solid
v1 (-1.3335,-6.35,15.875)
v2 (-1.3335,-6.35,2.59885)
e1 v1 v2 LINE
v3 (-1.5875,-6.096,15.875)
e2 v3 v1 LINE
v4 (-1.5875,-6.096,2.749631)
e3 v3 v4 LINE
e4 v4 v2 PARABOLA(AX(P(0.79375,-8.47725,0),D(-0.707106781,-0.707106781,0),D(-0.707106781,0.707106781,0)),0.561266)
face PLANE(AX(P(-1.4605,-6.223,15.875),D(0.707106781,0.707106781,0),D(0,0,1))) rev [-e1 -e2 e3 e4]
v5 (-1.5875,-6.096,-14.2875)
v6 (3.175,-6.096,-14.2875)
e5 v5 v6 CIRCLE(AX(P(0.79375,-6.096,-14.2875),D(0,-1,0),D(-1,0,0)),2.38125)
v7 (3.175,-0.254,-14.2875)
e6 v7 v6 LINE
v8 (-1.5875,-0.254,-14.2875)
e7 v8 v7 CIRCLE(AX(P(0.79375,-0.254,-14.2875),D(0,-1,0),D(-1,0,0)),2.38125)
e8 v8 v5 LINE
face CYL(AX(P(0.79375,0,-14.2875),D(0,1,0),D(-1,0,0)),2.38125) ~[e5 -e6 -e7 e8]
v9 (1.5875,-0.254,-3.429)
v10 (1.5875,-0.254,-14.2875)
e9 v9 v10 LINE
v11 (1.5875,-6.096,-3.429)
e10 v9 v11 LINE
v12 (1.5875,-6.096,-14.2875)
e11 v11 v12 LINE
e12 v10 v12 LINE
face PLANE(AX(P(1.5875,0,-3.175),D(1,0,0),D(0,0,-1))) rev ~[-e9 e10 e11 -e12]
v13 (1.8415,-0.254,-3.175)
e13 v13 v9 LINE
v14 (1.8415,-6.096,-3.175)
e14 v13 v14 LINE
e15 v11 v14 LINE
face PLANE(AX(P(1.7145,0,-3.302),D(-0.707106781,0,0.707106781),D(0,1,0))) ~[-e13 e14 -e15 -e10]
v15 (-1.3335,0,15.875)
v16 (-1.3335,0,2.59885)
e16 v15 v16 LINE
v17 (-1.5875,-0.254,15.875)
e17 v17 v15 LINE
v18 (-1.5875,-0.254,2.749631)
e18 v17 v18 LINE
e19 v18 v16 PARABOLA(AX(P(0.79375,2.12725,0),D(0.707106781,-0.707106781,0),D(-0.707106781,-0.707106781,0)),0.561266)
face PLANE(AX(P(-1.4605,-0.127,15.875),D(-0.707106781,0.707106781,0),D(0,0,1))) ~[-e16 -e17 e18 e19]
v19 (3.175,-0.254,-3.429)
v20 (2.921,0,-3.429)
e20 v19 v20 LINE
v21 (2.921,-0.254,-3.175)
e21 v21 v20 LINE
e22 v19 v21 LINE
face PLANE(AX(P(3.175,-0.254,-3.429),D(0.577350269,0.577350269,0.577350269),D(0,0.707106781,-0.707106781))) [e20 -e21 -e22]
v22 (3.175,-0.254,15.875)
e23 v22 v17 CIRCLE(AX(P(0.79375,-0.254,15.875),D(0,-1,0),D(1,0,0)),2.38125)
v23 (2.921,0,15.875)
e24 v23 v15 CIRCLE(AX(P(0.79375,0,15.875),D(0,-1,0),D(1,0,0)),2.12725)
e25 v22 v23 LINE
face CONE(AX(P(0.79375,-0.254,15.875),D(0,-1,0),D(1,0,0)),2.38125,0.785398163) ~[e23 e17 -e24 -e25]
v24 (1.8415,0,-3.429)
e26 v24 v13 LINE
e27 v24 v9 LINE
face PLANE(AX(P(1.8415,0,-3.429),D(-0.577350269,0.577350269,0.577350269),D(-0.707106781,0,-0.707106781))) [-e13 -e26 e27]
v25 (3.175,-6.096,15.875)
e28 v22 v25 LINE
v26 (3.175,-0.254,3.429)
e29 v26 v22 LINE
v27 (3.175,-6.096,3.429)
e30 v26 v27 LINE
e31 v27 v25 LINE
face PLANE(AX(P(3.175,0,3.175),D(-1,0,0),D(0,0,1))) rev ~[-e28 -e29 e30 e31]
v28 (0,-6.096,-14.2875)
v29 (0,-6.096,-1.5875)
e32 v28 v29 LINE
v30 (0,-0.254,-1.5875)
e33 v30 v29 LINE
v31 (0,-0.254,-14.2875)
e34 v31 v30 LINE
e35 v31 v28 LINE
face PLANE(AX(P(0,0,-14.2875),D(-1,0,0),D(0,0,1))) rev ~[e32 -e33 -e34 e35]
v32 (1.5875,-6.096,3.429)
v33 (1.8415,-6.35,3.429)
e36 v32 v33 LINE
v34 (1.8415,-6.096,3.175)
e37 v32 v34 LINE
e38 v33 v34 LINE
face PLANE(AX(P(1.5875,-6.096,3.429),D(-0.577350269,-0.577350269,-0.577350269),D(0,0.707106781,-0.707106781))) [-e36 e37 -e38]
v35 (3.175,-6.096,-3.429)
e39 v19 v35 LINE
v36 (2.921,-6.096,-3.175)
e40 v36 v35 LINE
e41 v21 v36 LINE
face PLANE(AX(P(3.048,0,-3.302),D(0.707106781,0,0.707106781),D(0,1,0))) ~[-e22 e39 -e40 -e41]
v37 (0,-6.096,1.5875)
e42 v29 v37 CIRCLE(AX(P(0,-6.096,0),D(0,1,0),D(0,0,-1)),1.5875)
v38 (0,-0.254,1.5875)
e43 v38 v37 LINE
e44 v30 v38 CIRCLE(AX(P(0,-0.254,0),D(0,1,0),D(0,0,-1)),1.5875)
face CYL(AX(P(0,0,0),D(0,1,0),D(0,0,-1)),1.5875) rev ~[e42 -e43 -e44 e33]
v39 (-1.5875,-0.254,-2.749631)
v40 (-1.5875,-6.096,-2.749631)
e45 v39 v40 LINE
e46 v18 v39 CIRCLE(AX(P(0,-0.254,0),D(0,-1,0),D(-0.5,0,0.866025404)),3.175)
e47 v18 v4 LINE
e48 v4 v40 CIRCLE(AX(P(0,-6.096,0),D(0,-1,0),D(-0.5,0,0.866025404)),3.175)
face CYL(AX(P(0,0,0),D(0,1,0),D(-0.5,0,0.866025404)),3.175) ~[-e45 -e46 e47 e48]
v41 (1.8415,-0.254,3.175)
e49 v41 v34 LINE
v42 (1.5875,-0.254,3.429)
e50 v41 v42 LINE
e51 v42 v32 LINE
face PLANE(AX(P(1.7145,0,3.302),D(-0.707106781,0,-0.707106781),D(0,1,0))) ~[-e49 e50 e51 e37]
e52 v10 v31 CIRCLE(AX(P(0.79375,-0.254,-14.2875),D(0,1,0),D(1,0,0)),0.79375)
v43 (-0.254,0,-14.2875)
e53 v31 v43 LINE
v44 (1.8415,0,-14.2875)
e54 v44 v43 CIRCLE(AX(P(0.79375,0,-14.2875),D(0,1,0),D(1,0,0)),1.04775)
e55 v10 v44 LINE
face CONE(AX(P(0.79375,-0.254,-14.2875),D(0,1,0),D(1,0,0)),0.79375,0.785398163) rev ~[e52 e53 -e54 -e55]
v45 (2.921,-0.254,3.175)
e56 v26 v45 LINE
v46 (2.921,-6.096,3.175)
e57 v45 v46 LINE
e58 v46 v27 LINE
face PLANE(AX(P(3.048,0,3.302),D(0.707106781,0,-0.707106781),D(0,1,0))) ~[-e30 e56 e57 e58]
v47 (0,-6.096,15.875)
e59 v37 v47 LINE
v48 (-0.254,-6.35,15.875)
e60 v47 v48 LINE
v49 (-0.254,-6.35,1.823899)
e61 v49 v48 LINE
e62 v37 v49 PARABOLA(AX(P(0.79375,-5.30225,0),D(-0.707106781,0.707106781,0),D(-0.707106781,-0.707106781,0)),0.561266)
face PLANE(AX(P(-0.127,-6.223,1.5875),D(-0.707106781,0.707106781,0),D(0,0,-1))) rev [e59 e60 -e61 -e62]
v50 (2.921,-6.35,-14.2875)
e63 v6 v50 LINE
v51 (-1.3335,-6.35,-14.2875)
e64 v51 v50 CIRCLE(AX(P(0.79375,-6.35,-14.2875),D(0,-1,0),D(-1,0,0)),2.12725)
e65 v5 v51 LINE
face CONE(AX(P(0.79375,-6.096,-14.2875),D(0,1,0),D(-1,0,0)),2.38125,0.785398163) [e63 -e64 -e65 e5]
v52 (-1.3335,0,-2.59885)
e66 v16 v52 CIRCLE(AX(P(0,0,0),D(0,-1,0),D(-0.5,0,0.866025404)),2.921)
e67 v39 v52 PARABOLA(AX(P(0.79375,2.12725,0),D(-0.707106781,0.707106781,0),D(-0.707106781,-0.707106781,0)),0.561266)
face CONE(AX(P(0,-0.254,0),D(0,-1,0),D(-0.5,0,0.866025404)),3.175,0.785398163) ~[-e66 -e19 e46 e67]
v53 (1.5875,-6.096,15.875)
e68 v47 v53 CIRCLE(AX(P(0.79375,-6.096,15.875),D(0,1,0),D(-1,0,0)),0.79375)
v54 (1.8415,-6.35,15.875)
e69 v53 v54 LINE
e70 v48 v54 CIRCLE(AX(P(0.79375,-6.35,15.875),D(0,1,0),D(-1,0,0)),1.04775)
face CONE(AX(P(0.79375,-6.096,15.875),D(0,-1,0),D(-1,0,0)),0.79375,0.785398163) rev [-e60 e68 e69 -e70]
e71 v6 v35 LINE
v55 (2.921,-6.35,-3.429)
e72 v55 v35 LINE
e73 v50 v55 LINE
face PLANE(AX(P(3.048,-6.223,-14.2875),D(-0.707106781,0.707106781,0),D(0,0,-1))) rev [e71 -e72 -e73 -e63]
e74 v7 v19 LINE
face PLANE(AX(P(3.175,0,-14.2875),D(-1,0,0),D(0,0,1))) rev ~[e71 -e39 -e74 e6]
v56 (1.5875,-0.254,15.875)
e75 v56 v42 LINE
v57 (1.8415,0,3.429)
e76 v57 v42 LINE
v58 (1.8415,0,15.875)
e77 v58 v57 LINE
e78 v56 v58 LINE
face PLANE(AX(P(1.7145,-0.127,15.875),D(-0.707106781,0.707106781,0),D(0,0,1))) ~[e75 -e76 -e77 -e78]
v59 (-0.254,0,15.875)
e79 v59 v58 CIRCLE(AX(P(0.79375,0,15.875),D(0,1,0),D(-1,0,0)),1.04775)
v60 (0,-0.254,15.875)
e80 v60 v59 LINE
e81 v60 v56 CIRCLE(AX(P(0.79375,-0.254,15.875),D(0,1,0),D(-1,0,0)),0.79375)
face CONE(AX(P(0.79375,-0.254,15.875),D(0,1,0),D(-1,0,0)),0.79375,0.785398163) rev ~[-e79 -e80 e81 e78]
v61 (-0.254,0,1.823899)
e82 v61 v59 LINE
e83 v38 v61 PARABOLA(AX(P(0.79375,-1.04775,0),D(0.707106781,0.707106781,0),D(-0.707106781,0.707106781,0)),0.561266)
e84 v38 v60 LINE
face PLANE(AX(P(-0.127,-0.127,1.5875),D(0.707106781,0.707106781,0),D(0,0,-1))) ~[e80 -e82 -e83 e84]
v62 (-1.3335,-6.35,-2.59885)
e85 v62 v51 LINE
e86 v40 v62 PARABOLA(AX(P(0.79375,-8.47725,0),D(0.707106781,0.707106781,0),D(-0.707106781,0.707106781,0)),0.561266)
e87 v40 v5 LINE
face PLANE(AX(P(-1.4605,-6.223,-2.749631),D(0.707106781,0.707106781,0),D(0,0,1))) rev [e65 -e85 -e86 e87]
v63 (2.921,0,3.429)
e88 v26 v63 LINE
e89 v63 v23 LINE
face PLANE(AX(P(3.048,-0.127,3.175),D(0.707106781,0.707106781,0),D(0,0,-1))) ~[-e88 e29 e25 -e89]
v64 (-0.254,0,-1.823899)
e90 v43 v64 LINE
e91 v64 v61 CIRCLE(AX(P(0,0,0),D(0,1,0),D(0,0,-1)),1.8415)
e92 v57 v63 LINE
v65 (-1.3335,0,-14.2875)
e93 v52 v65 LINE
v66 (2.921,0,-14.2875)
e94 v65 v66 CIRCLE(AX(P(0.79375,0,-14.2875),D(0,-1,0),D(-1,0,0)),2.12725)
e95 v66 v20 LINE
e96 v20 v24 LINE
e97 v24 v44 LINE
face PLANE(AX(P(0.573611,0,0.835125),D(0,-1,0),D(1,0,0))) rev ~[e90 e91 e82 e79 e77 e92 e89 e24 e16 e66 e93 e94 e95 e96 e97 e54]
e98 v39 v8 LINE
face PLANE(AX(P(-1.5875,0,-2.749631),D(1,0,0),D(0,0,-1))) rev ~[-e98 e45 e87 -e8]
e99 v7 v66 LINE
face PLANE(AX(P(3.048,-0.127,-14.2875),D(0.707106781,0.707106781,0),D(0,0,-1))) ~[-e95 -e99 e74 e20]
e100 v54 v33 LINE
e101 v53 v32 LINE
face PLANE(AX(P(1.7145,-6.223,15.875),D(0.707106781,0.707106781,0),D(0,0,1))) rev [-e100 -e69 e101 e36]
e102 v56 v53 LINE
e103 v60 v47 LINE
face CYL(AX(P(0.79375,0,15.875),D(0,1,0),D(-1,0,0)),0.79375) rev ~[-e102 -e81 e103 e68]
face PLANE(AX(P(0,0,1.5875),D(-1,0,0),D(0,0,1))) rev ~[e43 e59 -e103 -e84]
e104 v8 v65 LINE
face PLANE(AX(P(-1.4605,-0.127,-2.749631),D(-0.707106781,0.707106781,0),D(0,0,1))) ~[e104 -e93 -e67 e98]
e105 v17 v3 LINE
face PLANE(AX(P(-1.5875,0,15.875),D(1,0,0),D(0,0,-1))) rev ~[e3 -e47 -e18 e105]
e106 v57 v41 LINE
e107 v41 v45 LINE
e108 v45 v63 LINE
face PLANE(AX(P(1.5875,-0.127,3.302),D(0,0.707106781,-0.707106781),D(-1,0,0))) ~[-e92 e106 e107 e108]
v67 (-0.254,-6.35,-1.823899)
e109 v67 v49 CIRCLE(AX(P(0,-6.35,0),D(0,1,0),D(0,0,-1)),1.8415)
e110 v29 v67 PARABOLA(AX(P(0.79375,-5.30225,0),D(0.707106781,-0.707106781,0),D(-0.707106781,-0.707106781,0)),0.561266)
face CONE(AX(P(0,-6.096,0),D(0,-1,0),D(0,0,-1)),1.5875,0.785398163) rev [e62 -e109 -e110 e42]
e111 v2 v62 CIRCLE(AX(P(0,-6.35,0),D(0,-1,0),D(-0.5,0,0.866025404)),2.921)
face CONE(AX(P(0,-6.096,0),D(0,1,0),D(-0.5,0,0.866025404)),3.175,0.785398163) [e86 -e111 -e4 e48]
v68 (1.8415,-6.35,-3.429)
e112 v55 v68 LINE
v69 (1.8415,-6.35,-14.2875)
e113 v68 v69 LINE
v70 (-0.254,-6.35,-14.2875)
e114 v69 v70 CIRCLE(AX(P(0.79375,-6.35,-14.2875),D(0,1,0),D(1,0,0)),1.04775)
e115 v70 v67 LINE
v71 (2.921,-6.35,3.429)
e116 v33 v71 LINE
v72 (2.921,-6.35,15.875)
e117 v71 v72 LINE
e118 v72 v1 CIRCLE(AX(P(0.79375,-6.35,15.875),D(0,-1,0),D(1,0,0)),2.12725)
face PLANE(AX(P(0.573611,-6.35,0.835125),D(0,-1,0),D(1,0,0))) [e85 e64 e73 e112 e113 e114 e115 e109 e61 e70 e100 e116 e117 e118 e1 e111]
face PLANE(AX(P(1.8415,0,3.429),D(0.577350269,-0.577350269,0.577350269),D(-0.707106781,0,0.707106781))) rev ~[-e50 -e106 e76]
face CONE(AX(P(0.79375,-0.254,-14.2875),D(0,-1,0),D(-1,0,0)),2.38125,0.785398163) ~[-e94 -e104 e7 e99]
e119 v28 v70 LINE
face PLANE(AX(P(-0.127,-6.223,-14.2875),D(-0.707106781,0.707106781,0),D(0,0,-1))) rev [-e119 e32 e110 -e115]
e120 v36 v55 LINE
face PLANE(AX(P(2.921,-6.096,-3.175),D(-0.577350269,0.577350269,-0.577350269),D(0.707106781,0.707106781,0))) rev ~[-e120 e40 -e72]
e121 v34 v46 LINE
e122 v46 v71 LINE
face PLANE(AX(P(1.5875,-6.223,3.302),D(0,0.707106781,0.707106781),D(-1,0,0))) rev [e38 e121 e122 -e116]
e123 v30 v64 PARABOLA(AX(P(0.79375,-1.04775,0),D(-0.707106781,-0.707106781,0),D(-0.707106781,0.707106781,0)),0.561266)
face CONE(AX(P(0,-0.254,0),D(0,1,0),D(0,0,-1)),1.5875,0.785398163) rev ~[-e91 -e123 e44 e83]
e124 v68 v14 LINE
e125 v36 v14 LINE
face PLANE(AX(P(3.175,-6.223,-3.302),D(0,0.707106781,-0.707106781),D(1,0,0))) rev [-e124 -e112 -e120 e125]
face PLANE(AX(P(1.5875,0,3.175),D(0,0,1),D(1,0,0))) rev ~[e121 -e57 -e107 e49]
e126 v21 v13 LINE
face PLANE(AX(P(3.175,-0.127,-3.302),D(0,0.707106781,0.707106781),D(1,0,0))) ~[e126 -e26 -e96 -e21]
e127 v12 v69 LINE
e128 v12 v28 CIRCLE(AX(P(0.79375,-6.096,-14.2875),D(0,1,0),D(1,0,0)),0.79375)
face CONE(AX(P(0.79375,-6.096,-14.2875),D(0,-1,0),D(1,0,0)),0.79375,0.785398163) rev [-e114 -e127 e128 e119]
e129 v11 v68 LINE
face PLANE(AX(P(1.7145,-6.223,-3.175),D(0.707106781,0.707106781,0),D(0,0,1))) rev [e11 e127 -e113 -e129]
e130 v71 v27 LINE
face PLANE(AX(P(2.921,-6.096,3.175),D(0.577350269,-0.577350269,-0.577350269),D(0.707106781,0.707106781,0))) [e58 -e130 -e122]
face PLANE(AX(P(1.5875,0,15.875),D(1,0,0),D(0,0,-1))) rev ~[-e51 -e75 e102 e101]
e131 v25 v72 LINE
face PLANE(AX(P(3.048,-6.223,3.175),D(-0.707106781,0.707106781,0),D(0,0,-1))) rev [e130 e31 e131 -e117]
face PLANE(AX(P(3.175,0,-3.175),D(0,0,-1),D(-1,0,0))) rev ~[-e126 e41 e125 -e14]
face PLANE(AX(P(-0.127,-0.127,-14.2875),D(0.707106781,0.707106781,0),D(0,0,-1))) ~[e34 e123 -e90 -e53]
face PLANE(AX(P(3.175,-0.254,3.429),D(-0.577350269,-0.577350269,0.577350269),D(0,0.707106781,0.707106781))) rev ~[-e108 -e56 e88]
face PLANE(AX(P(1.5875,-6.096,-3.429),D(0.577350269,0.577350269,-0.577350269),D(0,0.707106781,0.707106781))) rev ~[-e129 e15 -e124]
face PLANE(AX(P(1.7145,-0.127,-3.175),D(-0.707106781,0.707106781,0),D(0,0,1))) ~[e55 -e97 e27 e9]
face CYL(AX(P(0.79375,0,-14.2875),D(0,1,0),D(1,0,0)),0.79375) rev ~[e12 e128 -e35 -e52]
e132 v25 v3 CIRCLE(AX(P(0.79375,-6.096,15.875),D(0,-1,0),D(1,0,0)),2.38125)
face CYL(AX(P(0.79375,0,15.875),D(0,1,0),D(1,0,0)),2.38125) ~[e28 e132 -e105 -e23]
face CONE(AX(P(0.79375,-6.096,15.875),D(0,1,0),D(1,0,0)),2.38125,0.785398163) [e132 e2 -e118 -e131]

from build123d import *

# Parameters (mm, degrees)
F1_DEPTH = 6.35
F2_SIZE  = 0.254


# Not quite as in the source:
# - a feature names something its author has since deleted; it is built from what else it names


with BuildPart() as f1:
    # F0 (on Front) → F1 (new body)
    with BuildSketch(Plane.XZ):
        with BuildLine():
            Line((0, 1.5875), (0, 15.875))
            ThreePointArc((0, 15.875), (0.79375, 16.66875), (1.5875, 15.875))
            Line((1.5875, 15.875), (1.5875, 3.175))
            Line((1.5875, 3.175), (3.175, 3.175))
            Line((3.175, 3.175), (3.175, 15.875))
            ThreePointArc((3.175, 15.875), (0.79375, 18.25625), (-1.5875, 15.875))
            Line((-1.5875, 15.875), (-1.5875, 2.749630657))
            ThreePointArc((-1.5875, 2.749630657), (-3.175, 0), (-1.5875, -2.749630657))
            Line((-1.5875, -2.749630657), (-1.5875, -14.2875))
            ThreePointArc((-1.5875, -14.2875), (0.79375, -16.66875), (3.175, -14.2875))
            Line((3.175, -14.2875), (3.175, -3.175))
            Line((3.175, -3.175), (1.5875, -3.175))
            Line((1.5875, -3.175), (1.5875, -14.2875))
            ThreePointArc((1.5875, -14.2875), (0.79375, -15.08125), (0, -14.2875))
            Line((0, -14.2875), (0, -1.5875))
            ThreePointArc((0, -1.5875), (-1.5875, 0), (0, 1.5875))
        make_face()
    extrude(amount=F1_DEPTH)

    # F2
    f2_edges = [f1.edges().sort_by_distance(p)[0] for p in [
        (-1.5875, -6.35, 9.312315),
        (0.79375, -6.35, 18.25625),
        (3.175, -6.35, 9.525),
        (-3.175, -6.35, 0),
        (-1.5875, -6.35, -8.518565),
        (0.79375, -6.35, -16.66875),
        (3.175, -6.35, -8.73125),
        (2.38125, -6.35, 3.175),
        (2.38125, -6.35, -3.175),
        (0, -6.35, -7.9375),
        (-1.5875, -6.35, 0),
        (0, -6.35, 8.73125),
        (1.5875, -3.175, 3.175),
        (1.5875, -3.175, -3.175),
        (2.38125, 0, -3.175),
        (3.175, -3.175, -3.175),
        (2.38125, 0, 3.175),
        (3.175, -3.175, 3.175),
        (3.175, 0, 9.525),
        (3.175, 0, -8.73125),
        (-3.175, 0, 0),
        (1.5875, 0, -8.73125),
        (1.5875, 0, 9.525),
        (-1.5875, 0, 0),
    ]]
    chamfer(f2_edges, length=F2_SIZE)


solid = f1.part
